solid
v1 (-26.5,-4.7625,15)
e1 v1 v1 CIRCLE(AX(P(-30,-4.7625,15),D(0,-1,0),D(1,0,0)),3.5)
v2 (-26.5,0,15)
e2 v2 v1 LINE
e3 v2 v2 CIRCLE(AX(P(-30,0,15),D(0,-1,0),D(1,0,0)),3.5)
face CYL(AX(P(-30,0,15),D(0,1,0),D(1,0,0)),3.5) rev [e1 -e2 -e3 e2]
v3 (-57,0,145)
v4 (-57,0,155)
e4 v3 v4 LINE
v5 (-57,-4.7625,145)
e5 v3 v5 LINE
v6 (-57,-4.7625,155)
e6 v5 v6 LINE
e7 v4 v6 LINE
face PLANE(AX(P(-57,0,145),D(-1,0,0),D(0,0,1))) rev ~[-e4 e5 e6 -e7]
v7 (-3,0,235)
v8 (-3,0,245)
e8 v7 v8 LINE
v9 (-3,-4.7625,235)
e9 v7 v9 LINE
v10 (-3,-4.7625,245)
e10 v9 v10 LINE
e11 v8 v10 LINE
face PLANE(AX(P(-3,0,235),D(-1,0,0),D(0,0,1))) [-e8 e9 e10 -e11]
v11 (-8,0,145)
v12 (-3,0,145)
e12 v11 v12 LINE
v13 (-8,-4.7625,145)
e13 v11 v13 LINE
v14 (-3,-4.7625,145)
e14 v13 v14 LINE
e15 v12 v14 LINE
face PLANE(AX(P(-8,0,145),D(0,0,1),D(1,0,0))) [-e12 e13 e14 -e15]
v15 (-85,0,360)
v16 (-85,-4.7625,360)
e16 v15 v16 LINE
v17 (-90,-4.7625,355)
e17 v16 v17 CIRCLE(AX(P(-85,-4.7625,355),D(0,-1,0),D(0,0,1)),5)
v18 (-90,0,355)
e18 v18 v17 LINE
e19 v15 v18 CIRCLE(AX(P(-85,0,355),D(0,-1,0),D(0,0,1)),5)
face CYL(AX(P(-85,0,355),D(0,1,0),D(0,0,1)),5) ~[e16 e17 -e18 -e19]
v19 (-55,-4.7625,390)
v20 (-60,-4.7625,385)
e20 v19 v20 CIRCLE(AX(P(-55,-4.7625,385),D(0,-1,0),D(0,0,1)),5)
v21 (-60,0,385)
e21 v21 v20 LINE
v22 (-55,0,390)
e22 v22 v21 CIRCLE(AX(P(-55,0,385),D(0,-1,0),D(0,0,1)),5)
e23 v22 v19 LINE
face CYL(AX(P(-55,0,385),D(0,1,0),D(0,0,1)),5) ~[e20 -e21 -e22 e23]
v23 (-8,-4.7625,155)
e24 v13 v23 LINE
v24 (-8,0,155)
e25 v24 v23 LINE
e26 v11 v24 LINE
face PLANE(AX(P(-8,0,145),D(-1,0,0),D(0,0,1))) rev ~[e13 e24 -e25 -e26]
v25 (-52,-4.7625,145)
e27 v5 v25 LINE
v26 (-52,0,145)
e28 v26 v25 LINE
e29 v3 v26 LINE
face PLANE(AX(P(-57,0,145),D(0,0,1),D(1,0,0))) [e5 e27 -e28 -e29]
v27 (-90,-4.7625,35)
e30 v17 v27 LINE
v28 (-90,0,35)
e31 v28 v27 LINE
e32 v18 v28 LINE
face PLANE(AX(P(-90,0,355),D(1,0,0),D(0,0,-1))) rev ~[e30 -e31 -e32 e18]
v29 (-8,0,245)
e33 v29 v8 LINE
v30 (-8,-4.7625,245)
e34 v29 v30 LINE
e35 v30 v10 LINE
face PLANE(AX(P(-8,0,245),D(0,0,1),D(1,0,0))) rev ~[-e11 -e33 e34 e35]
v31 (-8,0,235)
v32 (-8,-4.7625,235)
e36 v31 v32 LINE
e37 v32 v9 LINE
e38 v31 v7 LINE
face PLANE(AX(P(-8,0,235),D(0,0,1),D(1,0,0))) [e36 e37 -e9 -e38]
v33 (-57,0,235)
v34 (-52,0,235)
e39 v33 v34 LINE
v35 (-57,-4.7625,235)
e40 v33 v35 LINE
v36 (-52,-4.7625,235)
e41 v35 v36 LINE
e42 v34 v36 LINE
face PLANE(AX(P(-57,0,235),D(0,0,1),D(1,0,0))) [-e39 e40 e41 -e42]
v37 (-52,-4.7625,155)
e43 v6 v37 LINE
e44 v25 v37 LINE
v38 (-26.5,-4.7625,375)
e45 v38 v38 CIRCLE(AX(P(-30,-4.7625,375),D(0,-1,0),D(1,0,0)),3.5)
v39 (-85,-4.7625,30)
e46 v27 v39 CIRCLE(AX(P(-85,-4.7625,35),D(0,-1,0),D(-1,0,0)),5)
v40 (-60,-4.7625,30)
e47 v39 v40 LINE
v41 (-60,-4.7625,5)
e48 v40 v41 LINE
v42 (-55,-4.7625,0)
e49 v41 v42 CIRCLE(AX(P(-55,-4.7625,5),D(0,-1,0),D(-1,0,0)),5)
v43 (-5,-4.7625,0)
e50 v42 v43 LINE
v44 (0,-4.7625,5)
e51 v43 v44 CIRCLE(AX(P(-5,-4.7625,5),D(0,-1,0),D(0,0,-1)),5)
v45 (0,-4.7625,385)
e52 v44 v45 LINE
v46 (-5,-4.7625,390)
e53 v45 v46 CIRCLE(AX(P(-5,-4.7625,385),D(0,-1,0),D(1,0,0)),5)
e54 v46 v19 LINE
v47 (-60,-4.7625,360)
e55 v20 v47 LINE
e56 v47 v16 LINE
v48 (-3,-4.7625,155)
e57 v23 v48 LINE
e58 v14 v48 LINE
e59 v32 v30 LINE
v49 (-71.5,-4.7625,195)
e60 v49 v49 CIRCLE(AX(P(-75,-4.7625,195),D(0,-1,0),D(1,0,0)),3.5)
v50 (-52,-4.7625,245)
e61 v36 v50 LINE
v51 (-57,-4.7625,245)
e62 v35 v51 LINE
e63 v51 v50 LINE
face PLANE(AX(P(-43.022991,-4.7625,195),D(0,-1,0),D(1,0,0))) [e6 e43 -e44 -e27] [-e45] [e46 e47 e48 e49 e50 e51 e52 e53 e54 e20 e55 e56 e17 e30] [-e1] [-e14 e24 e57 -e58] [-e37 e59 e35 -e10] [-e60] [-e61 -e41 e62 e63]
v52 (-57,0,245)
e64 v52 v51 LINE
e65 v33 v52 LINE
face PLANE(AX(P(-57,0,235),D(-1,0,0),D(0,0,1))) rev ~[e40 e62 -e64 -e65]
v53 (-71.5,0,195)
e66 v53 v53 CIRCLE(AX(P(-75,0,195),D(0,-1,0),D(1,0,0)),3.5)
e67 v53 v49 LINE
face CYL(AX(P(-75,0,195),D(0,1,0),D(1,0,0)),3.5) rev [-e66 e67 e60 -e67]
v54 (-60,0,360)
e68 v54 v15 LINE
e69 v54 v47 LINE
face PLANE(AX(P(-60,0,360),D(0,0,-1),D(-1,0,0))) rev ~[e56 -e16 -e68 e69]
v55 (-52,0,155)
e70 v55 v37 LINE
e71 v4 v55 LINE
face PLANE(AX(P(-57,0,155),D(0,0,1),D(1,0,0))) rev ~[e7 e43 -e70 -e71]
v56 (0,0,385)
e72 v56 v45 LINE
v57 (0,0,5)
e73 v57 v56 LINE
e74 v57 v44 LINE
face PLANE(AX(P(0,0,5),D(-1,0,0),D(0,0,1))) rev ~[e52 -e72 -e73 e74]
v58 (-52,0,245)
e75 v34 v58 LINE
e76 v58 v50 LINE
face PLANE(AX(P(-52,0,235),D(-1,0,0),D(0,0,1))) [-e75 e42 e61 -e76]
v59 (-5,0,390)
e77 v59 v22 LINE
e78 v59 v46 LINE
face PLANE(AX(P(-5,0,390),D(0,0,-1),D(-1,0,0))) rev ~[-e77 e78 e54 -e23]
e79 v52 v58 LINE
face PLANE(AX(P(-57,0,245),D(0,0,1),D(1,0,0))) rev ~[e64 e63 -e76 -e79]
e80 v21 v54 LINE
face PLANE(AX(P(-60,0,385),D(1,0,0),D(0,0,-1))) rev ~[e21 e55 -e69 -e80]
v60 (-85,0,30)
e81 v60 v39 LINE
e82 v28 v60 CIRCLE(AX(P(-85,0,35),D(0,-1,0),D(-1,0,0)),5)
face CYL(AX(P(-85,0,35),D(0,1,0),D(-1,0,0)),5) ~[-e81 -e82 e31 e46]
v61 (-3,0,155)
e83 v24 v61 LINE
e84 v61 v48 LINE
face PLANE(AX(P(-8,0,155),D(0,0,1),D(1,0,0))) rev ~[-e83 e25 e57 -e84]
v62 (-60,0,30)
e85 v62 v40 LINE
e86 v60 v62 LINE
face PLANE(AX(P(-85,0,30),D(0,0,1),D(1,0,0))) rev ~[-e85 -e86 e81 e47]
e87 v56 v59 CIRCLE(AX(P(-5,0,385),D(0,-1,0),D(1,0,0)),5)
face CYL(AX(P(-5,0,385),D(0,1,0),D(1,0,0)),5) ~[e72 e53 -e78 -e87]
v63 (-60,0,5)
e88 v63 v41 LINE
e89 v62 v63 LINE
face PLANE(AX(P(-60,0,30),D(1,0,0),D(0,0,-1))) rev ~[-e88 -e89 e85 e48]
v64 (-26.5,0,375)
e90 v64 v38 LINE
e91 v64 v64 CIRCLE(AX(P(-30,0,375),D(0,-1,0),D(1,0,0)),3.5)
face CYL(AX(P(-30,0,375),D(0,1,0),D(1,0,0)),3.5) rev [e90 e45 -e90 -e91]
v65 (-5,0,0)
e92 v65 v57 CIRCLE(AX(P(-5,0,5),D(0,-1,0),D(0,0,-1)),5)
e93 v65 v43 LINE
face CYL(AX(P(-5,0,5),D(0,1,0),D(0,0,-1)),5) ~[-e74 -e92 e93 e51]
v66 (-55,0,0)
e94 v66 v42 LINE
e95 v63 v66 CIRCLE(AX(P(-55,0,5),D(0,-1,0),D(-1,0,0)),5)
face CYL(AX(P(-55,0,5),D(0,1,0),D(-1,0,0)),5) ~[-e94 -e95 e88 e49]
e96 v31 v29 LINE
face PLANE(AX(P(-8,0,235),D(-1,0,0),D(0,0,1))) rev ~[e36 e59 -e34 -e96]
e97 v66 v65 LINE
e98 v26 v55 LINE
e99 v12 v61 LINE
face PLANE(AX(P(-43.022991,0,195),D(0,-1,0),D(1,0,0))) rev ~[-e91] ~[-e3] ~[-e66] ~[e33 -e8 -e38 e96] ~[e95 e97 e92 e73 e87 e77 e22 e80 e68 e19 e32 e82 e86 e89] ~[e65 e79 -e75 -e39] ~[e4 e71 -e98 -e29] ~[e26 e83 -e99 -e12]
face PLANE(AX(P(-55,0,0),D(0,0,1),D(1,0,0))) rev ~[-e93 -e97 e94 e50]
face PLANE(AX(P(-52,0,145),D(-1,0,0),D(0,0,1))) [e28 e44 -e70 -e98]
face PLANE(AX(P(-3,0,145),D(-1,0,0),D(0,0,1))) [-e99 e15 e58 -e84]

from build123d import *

# Parameters (mm, degrees)
F1_W     = 5
F1_H     = 10
F1_R     = 3.5
F2_DEPTH = 4.7625


# Not quite as in the source:
# - a length typed as a fraction of an inch, garbled in the dataset ("3 / 203.2 mm" for 3/8 in), is restored


with BuildPart() as f2:
    # F1 (on Front) → F2 (new body)
    with BuildSketch(Plane.XZ):
        with BuildLine():
            ThreePointArc((-5, 0), (-1.4644660941, 1.4644660941), (0, 5))
            Line((0, 5), (0, 385))
            ThreePointArc((0, 385), (-1.4644660941, 388.5355339059), (-5, 390))
            Line((-5, 390), (-55, 390))
            ThreePointArc((-55, 390), (-58.5355339059, 388.5355339059), (-60, 385))
            Line((-60, 385), (-60, 360))
            Line((-60, 360), (-85, 360))
            ThreePointArc((-85, 360), (-88.5355339059, 358.5355339059), (-90, 355))
            Line((-90, 355), (-90, 35))
            ThreePointArc((-90, 35), (-88.5355339059, 31.4644660941), (-85, 30))
            Line((-85, 30), (-60, 30))
            Line((-60, 30), (-60, 5))
            ThreePointArc((-60, 5), (-58.5355339059, 1.4644660941), (-55, 0))
            Line((-55, 0), (-5, 0))
        make_face()
        with Locations((-54.5, 150)):
            Rectangle(F1_W, F1_H, mode=Mode.SUBTRACT)
        with Locations((-30, 15)):
            Circle(F1_R, mode=Mode.SUBTRACT)
        with Locations((-5.5, 150)):
            Rectangle(F1_W, F1_H, mode=Mode.SUBTRACT)
        with Locations((-75, 195)):
            Circle(F1_R, mode=Mode.SUBTRACT)
        with Locations((-54.5, 240)):
            Rectangle(F1_W, F1_H, mode=Mode.SUBTRACT)
        with Locations((-5.5, 240)):
            Rectangle(F1_W, F1_H, mode=Mode.SUBTRACT)
        with Locations((-30, 375)):
            Circle(F1_R, mode=Mode.SUBTRACT)
    extrude(amount=F2_DEPTH)


solid = f2.part
